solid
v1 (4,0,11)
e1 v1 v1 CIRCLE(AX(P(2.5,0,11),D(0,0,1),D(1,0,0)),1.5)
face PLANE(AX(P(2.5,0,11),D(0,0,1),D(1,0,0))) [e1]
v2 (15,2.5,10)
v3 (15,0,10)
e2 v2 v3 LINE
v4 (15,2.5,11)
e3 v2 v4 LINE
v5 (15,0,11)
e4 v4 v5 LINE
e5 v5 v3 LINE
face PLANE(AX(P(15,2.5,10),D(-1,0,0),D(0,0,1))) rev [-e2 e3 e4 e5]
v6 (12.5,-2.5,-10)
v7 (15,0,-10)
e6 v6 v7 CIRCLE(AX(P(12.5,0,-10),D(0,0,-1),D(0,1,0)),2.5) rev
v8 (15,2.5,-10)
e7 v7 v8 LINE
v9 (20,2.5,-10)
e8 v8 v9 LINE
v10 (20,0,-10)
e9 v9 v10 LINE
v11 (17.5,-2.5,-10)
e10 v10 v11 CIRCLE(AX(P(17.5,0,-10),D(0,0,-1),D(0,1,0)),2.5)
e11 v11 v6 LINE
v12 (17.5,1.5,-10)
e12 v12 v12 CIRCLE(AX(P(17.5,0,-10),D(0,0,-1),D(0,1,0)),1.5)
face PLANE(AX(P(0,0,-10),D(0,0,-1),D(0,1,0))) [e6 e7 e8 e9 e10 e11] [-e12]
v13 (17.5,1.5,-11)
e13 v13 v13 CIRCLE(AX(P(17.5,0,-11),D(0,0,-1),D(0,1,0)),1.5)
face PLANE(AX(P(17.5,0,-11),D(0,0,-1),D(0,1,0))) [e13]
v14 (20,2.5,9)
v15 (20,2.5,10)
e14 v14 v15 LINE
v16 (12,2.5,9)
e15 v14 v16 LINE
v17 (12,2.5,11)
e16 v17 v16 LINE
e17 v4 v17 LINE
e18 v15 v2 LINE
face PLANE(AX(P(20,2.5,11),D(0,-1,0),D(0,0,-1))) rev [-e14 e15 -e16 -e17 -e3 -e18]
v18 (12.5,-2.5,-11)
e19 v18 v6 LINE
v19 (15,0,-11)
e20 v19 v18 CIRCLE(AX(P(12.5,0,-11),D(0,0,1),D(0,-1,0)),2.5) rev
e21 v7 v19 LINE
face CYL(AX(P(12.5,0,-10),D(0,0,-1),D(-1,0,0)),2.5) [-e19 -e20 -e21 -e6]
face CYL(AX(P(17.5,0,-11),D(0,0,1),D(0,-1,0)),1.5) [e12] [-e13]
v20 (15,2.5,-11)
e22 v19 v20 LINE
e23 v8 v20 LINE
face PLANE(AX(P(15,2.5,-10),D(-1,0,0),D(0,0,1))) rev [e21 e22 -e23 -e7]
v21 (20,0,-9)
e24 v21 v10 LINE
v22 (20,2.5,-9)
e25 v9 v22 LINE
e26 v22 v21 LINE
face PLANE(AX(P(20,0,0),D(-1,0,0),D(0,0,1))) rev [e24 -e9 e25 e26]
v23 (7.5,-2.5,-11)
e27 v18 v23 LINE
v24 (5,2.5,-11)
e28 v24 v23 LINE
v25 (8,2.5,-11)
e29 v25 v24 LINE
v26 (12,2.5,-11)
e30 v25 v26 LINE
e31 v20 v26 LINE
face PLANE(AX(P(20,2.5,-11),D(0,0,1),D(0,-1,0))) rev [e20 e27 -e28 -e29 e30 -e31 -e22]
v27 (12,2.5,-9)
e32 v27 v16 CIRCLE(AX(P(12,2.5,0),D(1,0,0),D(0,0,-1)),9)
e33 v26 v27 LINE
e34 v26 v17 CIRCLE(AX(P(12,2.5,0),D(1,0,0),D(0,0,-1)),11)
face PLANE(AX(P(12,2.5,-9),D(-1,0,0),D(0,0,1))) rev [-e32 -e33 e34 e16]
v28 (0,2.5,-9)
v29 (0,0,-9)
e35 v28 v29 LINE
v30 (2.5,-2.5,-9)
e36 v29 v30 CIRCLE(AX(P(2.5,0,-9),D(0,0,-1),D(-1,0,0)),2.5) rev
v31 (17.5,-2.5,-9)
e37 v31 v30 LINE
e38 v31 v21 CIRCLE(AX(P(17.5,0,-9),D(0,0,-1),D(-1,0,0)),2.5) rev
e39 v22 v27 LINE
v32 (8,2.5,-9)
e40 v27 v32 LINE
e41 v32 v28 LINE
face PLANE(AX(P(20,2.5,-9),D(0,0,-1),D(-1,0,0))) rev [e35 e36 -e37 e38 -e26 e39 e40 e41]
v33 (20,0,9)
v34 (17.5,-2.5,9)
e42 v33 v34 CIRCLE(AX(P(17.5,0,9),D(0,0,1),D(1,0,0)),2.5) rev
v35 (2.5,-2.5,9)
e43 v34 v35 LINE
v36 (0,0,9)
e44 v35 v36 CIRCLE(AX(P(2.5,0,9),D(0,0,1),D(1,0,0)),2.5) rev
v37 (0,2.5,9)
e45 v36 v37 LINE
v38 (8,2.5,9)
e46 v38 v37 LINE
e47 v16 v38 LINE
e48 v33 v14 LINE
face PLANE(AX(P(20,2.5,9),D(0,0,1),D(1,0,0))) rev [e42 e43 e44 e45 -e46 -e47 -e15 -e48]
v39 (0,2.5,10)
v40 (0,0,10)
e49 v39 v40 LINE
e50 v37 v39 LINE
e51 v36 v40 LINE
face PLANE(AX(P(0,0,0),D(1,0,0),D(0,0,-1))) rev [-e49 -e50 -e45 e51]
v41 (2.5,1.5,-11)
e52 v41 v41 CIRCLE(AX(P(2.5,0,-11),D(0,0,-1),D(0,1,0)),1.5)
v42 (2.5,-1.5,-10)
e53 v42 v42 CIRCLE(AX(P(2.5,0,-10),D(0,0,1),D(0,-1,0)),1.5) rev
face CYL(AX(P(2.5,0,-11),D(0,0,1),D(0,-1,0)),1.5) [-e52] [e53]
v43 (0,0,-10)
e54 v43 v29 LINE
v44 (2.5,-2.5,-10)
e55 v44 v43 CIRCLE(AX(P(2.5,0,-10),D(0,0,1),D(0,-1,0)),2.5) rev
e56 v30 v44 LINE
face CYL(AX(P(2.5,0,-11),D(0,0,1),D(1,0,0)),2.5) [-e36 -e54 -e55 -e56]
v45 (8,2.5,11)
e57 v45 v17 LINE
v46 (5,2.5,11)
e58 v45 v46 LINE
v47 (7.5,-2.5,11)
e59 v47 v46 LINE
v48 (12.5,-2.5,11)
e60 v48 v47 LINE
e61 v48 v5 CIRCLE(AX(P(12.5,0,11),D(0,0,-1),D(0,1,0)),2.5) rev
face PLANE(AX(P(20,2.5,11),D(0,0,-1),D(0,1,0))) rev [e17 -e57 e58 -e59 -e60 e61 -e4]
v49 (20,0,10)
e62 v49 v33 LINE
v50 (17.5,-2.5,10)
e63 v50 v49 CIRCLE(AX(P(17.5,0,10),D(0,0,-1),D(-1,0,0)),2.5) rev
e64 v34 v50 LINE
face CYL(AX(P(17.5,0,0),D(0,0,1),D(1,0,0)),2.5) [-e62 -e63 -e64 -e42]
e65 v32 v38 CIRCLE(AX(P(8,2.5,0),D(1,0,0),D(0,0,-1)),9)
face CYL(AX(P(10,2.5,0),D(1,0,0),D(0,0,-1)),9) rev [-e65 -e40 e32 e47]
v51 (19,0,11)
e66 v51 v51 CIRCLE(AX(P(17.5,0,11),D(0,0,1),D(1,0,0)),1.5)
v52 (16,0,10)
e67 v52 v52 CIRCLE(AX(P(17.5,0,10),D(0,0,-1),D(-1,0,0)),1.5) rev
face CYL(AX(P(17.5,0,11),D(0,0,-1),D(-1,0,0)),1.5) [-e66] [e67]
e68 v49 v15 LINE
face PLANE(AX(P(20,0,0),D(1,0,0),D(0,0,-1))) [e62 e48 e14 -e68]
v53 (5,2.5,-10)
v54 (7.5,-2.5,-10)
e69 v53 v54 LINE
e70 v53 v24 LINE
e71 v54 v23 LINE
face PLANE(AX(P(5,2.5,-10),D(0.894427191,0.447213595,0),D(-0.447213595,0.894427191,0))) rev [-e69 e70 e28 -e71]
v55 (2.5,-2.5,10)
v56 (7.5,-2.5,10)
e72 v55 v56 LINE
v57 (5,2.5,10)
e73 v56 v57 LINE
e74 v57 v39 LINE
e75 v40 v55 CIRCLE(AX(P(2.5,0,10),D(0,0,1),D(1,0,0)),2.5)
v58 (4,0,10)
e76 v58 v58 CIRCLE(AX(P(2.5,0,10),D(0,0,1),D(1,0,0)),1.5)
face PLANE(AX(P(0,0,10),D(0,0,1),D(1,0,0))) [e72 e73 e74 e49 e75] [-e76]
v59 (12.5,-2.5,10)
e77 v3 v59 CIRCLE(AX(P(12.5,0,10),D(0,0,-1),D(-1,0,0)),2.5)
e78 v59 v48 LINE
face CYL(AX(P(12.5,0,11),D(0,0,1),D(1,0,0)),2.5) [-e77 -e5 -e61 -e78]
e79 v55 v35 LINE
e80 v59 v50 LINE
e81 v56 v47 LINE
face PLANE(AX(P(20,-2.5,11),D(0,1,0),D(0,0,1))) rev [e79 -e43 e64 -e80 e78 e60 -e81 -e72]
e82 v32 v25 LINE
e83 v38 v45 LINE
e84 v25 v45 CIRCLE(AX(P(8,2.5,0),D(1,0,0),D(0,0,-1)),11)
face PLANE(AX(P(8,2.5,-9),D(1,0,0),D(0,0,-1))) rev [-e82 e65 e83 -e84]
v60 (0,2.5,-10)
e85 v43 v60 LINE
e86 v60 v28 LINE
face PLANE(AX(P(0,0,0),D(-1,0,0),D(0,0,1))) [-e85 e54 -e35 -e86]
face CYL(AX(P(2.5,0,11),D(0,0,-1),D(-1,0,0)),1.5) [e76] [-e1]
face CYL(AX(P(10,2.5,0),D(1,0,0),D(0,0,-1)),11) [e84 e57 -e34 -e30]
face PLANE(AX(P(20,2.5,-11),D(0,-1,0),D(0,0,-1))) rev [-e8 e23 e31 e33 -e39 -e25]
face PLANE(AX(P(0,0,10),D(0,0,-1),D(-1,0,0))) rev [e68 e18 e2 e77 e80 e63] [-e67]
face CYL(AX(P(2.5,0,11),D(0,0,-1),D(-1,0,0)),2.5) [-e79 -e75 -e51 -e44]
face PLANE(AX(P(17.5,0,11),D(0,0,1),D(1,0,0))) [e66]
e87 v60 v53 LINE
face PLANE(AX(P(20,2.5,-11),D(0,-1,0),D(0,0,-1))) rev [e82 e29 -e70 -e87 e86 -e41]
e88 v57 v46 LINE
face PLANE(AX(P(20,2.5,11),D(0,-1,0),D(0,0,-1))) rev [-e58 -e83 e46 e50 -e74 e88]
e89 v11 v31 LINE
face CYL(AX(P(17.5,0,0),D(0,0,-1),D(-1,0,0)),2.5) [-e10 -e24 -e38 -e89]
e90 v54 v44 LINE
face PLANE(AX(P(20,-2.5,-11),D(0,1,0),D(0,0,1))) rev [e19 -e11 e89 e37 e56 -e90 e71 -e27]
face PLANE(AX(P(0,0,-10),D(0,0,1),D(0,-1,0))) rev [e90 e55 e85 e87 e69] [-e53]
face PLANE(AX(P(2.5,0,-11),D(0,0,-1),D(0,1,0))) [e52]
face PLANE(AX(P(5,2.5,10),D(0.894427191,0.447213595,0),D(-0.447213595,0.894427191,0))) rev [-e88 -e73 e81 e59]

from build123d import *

# Parameters (mm, degrees)
SKETCH3_W             = 2
SKETCH3_H             = 5
BOSS_EXTRUDE1_DEPTH   = 20
BOSS_EXTRUDE1_2_DEPTH = 20
SKETCH4_W             = 5
SKETCH4_H             = 5
CUT_EXTRUDE1_DEPTH    = 1
SKETCH5_W             = 5
SKETCH5_H             = 5
CUT_EXTRUDE2_DEPTH    = 1
SWEEP1_START          = 8
SWEEP1_DEPTH          = 4
SKETCH7_R             = 1.5
BOSS_EXTRUDE2_DEPTH   = 1
BOSS_EXTRUDE3_START   = 1
SKETCH8_R             = 1.5
BOSS_EXTRUDE3_DEPTH   = 1
FILLET1_R             = 2.5
CUT_EXTRUDE3_DEPTH    = 1
CUT_EXTRUDE4_DEPTH    = 1
FILLET2_R             = 2.5


# Read off the part's stored shape, not the designer's step: Sweep1
with BuildPart() as part:
    # Sketch3 → Boss-Extrude1 (new body)
    with BuildSketch(Plane(origin=(0, 0, 0), x_dir=(0, 0, -1), z_dir=(1, 0, 0))):
        with Locations((-10, 0)):
            Rectangle(SKETCH3_W, SKETCH3_H)
    extrude(amount=BOSS_EXTRUDE1_DEPTH)

    # Sketch4 → Cut-Extrude1 (cut)
    with BuildSketch(Plane.XY.offset(11)):
        with Locations((2.5, 0)):
            Rectangle(SKETCH4_W, SKETCH4_H)
        with Locations((17.5, 0)):
            Rectangle(SKETCH4_W, SKETCH4_H)
    extrude(amount=-CUT_EXTRUDE1_DEPTH, mode=Mode.SUBTRACT)



with BuildPart() as body_2:
    # Sketch3 → Boss-Extrude1 2 (new body)
    with BuildSketch(Plane(origin=(0, 0, 0), x_dir=(0, 0, -1), z_dir=(1, 0, 0))):
        with Locations((10, 0)):
            Rectangle(SKETCH3_W, SKETCH3_H)
    extrude(amount=BOSS_EXTRUDE1_2_DEPTH)

    # Sketch5 → Cut-Extrude2 (cut)
    with BuildSketch(Plane(origin=(0, 0, -11), x_dir=(-1, 0, 0), z_dir=(0, 0, -1))):
        with Locations((-17.5, 0)):
            Rectangle(SKETCH5_W, SKETCH5_H)
        with Locations((-2.5, 0)):
            Rectangle(SKETCH5_W, SKETCH5_H)
    extrude(amount=-CUT_EXTRUDE2_DEPTH, mode=Mode.SUBTRACT)


with BuildPart() as part_1:
    add(part.part)

    add(body_2.part)  # Sweep1 merges body 2
    # Sweep1 outline → Sweep1 (add)
    with BuildSketch(Plane.YZ.offset(SWEEP1_START)):
        with BuildLine():
            Line((2.5, -9), (2.5, -11))
            ThreePointArc((2.5, -11), (13.5, 0), (2.5, 11))
            Line((2.5, 11), (2.5, 9))
            ThreePointArc((2.5, 9), (11.5, 0), (2.5, -9))
        make_face()
    extrude(amount=SWEEP1_DEPTH)

    # Sketch7 → Boss-Extrude2 (add)
    with BuildSketch(Plane(origin=(0, 0, -10), x_dir=(-1, 0, 0), z_dir=(0, 0, -1))):
        with Locations(Location((-2.5, 0, 0), (0, 0, 270))):
            Circle(SKETCH7_R)
        with Locations(Location((-17.5, 0, 0), (0, 0, 90))):
            Circle(SKETCH7_R)
    extrude(amount=BOSS_EXTRUDE2_DEPTH)

    # Sketch8 → Boss-Extrude3 (add)
    with BuildSketch(Plane.XY.offset(10).offset(BOSS_EXTRUDE3_START)):
        with Locations(Location((17.5, 0, 0), (0, 0, 90))):
            Circle(SKETCH8_R)
        with Locations(Location((2.5, 0, 0), (0, 0, 270))):
            Circle(SKETCH8_R)
    extrude(amount=-BOSS_EXTRUDE3_DEPTH)

    # Fillet1
    fillet1_edges = [part_1.edges().sort_by_distance(p)[0] for p in [
        (0, -2.5, 9.5),
        (20, -2.5, 9.5),
        (20, -2.5, -9.5),
        (0, -2.5, -9.5),
    ]]
    fillet(fillet1_edges, radius=FILLET1_R)

    # Sketch9 → Cut-Extrude3 (cut)
    with BuildSketch(Plane.XY.offset(11)):
        Polygon((5, 2.5), (7.5, -2.5), (5, -2.5), align=None)
    extrude(amount=-CUT_EXTRUDE3_DEPTH, mode=Mode.SUBTRACT)

    # Sketch10 → Cut-Extrude4 (cut)
    with BuildSketch(Plane(origin=(0, 0, -11), x_dir=(-1, 0, 0), z_dir=(0, 0, -1))):
        Polygon((-5, 2.5), (-7.5, -2.5), (-5, -2.5), align=None)
    extrude(amount=-CUT_EXTRUDE4_DEPTH, mode=Mode.SUBTRACT)

    # Fillet2
    fillet2_edges = [part_1.edges().sort_by_distance(p)[0] for p in [
        (15, -2.5, 10.5),
        (15, -2.5, -10.5),
    ]]
    fillet(fillet2_edges, radius=FILLET2_R)


solid = part_1.part
